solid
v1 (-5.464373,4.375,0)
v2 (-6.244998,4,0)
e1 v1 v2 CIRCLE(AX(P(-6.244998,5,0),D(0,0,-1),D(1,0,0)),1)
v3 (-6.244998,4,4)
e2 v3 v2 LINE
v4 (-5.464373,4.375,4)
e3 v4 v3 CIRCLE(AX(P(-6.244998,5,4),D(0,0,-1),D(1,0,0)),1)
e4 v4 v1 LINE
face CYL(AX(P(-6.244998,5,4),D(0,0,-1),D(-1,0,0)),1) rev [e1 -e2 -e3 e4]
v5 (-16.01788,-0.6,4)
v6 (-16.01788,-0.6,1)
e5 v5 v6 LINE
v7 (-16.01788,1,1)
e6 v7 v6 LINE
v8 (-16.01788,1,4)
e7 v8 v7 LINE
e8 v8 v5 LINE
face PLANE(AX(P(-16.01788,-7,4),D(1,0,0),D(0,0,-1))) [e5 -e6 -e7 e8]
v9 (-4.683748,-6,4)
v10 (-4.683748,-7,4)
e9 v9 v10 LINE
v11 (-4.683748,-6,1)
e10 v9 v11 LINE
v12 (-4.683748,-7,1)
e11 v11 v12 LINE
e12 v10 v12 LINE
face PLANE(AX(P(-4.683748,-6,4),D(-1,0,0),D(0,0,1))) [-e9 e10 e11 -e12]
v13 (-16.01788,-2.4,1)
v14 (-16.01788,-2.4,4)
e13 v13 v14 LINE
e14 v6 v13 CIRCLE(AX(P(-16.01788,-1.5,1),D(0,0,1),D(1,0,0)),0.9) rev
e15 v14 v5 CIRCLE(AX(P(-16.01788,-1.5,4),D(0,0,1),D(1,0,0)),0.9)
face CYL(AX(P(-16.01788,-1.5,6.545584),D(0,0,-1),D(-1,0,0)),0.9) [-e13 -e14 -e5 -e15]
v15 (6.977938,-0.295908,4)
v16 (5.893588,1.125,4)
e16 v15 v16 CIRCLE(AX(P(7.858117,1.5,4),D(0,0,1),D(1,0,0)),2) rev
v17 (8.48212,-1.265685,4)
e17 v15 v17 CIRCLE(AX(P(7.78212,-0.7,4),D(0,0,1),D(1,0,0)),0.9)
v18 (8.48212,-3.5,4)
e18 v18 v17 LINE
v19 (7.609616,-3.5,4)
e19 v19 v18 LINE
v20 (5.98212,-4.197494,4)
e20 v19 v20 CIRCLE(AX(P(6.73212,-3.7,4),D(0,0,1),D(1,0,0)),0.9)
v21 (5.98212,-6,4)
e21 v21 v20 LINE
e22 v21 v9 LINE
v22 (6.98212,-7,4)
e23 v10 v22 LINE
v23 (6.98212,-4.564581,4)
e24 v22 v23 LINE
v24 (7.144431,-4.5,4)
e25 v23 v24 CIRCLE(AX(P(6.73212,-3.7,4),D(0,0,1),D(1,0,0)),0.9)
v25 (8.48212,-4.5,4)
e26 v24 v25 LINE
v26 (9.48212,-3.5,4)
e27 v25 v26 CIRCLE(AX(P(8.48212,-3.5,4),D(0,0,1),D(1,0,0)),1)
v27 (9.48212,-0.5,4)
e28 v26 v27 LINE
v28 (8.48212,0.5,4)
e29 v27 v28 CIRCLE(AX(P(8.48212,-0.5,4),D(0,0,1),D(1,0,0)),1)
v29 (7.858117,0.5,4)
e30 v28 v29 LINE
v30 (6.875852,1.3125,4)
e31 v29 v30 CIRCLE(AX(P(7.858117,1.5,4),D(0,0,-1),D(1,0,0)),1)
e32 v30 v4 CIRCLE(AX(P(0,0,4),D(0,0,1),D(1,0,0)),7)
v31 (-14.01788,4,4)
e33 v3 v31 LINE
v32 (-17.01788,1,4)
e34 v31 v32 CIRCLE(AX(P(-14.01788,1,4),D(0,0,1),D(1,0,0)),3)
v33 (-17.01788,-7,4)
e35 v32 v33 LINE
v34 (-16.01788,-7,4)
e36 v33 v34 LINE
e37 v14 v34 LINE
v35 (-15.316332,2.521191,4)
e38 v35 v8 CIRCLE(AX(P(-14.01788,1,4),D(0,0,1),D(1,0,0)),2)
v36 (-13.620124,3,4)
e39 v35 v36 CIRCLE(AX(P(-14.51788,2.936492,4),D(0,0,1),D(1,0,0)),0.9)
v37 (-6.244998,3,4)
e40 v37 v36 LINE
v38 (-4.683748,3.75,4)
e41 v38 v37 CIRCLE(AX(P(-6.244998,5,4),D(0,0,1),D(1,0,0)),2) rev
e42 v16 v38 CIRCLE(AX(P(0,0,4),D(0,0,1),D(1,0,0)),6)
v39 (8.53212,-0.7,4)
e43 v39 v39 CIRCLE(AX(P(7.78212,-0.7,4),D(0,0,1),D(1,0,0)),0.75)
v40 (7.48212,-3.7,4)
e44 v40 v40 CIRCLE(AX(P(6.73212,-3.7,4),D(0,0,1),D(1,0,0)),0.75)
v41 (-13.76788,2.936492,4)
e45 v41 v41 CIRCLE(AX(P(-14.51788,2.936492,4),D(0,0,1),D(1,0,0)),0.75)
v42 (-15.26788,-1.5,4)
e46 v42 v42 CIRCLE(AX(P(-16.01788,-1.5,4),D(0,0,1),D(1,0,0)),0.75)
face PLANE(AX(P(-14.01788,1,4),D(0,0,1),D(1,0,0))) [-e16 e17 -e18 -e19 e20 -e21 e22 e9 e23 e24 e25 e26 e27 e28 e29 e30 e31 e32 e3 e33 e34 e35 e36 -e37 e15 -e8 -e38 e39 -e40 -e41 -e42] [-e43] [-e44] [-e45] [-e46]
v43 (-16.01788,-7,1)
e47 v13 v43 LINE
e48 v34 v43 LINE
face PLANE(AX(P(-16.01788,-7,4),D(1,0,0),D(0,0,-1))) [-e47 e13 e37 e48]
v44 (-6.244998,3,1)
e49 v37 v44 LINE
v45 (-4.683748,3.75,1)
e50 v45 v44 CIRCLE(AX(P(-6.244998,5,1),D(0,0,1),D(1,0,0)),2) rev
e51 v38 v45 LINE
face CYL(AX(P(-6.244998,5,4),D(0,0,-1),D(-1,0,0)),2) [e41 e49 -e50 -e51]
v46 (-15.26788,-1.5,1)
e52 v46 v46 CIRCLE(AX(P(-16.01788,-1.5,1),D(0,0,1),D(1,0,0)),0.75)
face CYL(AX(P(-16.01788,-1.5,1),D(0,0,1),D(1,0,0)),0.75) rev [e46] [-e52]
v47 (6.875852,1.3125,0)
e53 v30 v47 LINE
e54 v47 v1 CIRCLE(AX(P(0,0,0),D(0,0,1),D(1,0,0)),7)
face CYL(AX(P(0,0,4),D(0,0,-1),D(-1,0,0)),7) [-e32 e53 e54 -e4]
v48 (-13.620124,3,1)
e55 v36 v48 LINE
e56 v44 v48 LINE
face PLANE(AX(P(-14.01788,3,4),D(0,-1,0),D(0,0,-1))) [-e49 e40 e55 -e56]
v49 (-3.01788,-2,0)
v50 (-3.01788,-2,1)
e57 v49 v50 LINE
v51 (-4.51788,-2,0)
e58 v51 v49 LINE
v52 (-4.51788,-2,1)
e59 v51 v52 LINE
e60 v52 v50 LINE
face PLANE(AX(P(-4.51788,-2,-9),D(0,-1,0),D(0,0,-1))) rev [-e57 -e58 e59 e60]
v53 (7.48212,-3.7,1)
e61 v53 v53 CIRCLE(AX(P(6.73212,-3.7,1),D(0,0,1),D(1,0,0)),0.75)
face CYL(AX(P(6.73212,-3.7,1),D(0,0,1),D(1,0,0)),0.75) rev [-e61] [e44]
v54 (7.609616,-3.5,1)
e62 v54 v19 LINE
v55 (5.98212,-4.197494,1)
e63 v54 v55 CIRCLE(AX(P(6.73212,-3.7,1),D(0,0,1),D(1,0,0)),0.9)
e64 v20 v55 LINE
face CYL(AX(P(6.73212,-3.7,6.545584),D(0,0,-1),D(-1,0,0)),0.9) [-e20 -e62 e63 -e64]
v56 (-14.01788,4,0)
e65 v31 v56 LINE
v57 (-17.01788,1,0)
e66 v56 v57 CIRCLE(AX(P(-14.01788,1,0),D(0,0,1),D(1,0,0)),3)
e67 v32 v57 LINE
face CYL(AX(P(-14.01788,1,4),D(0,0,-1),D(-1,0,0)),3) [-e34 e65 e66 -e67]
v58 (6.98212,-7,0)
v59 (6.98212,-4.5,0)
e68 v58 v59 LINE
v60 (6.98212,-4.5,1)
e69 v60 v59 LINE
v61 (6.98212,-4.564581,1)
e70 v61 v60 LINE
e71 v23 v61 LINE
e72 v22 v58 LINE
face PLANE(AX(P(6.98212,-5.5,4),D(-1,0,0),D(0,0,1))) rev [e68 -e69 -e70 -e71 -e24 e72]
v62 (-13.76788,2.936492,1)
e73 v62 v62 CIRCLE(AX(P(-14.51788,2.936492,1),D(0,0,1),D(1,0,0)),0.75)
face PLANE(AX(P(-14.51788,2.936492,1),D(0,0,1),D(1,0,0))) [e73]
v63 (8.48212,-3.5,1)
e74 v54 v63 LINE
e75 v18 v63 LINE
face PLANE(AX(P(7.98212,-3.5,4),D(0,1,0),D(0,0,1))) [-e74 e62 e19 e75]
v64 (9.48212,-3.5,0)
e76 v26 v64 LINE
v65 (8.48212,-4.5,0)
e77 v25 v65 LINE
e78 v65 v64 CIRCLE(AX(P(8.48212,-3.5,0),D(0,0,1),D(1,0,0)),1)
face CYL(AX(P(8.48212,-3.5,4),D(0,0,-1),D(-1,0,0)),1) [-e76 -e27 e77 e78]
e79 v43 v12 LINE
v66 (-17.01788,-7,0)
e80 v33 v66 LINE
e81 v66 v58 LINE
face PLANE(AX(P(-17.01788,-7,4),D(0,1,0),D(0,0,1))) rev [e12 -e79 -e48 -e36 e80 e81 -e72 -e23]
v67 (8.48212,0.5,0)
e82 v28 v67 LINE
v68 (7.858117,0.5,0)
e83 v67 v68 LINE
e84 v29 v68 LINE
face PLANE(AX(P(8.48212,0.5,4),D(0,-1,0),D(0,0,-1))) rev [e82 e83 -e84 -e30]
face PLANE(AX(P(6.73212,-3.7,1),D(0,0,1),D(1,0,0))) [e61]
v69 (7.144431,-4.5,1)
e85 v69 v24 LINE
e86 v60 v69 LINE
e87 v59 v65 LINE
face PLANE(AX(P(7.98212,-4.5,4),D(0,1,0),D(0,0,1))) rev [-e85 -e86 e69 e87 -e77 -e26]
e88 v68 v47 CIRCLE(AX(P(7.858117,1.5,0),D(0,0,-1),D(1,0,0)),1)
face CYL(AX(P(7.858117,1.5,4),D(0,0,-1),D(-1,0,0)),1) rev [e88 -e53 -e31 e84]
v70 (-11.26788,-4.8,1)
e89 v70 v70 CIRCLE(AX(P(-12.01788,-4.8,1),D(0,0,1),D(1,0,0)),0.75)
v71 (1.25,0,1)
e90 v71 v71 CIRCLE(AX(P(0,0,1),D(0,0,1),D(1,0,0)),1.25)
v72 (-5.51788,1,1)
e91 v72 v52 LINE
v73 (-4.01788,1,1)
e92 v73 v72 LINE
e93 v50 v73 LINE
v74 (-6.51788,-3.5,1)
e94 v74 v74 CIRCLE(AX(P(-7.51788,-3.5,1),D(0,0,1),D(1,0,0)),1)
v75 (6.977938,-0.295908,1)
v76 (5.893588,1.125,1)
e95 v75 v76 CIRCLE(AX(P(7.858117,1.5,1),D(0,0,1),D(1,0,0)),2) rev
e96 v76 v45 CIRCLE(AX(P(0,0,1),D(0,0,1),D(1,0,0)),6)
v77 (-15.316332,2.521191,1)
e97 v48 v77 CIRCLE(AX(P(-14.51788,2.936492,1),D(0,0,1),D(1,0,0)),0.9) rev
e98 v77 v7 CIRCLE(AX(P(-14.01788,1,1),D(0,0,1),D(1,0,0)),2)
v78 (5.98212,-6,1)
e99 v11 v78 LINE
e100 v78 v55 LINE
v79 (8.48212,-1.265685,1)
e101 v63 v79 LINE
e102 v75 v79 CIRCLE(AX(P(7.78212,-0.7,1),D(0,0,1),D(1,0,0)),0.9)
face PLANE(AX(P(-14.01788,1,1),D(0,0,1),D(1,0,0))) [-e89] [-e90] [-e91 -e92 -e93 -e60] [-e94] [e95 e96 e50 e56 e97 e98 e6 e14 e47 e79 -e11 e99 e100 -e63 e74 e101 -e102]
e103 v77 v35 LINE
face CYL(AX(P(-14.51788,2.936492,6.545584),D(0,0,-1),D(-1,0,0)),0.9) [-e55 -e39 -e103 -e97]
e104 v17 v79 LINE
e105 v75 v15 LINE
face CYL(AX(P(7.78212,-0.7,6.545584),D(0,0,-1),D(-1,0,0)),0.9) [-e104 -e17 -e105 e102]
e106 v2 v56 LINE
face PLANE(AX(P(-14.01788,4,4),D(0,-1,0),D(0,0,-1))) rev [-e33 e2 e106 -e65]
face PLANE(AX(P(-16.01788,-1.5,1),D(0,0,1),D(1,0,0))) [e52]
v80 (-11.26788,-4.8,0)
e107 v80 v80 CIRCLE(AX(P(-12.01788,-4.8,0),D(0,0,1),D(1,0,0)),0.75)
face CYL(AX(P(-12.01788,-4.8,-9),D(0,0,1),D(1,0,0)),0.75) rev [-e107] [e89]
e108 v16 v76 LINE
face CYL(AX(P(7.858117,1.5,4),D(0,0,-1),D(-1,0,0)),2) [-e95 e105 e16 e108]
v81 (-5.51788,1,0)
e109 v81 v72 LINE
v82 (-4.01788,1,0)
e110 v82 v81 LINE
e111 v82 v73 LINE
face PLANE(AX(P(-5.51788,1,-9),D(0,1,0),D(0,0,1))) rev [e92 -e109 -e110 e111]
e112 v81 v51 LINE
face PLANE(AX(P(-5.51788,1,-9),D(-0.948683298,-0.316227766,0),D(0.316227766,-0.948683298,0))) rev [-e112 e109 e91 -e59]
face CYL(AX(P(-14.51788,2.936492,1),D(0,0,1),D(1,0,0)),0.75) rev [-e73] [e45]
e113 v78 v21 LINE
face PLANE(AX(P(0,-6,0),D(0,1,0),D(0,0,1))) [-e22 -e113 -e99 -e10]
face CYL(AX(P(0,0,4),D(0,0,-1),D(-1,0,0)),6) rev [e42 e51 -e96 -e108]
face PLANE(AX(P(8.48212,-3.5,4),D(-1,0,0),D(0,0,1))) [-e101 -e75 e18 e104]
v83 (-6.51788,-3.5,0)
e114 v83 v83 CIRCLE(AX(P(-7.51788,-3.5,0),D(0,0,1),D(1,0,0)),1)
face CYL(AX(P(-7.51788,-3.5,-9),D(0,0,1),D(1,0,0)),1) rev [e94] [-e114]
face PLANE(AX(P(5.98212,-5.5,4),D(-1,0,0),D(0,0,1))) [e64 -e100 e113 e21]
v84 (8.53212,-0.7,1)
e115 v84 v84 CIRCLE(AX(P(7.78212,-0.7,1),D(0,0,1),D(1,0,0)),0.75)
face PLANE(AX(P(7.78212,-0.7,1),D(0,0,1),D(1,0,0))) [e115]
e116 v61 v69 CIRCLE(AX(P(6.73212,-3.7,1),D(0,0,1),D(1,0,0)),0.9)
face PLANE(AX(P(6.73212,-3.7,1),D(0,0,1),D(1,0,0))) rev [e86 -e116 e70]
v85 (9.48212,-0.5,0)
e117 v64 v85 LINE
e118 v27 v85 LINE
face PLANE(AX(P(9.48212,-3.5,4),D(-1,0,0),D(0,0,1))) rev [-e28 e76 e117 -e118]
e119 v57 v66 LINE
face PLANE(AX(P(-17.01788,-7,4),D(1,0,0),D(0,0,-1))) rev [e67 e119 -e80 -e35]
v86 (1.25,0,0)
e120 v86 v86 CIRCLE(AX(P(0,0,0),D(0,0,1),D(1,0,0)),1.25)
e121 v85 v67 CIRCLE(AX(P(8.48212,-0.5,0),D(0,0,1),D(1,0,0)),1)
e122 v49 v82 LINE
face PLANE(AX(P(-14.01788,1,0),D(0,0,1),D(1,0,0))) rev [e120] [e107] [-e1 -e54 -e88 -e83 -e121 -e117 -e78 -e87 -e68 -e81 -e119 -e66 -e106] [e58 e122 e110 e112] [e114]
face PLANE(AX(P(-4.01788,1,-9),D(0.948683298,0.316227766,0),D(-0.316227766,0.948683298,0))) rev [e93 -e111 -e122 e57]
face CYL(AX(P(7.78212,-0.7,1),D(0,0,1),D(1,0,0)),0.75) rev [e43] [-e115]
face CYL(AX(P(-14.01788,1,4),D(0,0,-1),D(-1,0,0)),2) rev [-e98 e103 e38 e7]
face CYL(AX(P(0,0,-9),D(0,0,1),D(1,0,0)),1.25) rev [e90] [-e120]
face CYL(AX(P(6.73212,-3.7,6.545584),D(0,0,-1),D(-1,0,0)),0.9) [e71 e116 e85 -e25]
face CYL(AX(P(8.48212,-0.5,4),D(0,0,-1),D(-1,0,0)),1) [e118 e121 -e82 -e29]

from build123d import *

# Parameters (mm, degrees)
BOSS_EXTRUDE1_DEPTH = 4
SHELL1_START        = 1
SHELL1_DEPTH        = 3
SKETCH2_R           = 1.25
SKETCH2_R_2         = 0.75
SKETCH2_R_3         = 1
CUT_EXTRUDE1_DEPTH  = 10
SKETCH3_W           = 10.665868521
SKETCH3_H           = 3
BOSS_EXTRUDE2_DEPTH = 1
SKETCH4_R           = 0.9
BOSS_EXTRUDE3_DEPTH = 3
SKETCH5_R           = 0.75
CUT_EXTRUDE2_DEPTH  = 3


# Read off the part's stored shape, not the designer's step: Shell1
with BuildPart() as part:
    # Sketch1 → Boss-Extrude1 (new body)
    with BuildSketch(Plane.XY):
        with BuildLine():
            Line((-17.017879978, -7), (6.982120022, -7))
            Line((6.982120022, -7), (6.982120022, -5.5))
            Line((6.982120022, -5.5), (6.982120022, -4.5))
            Line((6.982120022, -4.5), (7.982120022, -4.5))
            Line((7.982120022, -4.5), (8.482120022, -4.5))
            ThreePointArc((8.482120022, -4.5), (9.189226803, -4.207106781), (9.482120022, -3.5))
            Line((9.482120022, -3.5), (9.482120022, -0.5))
            ThreePointArc((9.482120022, -0.5), (9.189226803, 0.207106781), (8.482120022, 0.5))
            Line((8.482120022, 0.5), (7.858116823, 0.5))
            ThreePointArc((7.858116823, 0.5), (7.220739384, 0.72944825), (6.87585222, 1.3125))
            ThreePointArc((6.87585222, 1.3125), (1.68605895, 6.793909421), (-5.464373249, 4.375))
            ThreePointArc((-5.464373249, 4.375), (-5.811985297, 4.098612181), (-6.244997998, 4))
            Line((-6.244997998, 4), (-14.017879978, 4))
            ThreePointArc((-14.017879978, 4), (-16.139200322, 3.121320344), (-17.017879978, 1))
            Line((-17.017879978, 1), (-17.017879978, -7))
        make_face()
    extrude(amount=BOSS_EXTRUDE1_DEPTH)

    # Shell1 outline → Shell1 (cut)
    with BuildSketch(Plane.XY.offset(SHELL1_START)):
        with BuildLine():
            Line((-16.017879978, 1), (-16.017879978, -7))
            Line((-16.017879978, -7), (5.982120022, -7))
            Line((5.982120022, -7), (5.982120022, -3.5))
            Line((5.982120022, -3.5), (8.482120022, -3.5))
            Line((8.482120022, -3.5), (8.482120022, -0.5))
            Line((8.482120022, -0.5), (7.858116823, -0.5))
            ThreePointArc((7.858116823, -0.5), (6.583361944, -0.041103501), (5.893587617, 1.125))
            ThreePointArc((5.893587617, 1.125), (1.445193386, 5.823350932), (-4.683748499, 3.75))
            ThreePointArc((-4.683748499, 3.75), (-5.378972594, 3.197224362), (-6.244997998, 3))
            Line((-6.244997998, 3), (-14.017879978, 3))
            ThreePointArc((-14.017879978, 3), (-15.43209354, 2.414213562), (-16.017879978, 1))
        make_face()
    extrude(amount=SHELL1_DEPTH, mode=Mode.SUBTRACT)

    # Sketch2 → Cut-Extrude1 (cut)
    with BuildSketch(Plane.XY.offset(1)):
        Circle(SKETCH2_R)
        with Locations((-12.017879978, -4.8)):
            Circle(SKETCH2_R_2)
        with Locations((-7.517879978, -3.5)):
            Circle(SKETCH2_R_3)
        Polygon((-5.517879978, 1), (-4.017879978, 1), (-3.017879978, -2), (-4.517879978, -2), align=None)
    extrude(amount=-CUT_EXTRUDE1_DEPTH, mode=Mode.SUBTRACT)

    # Sketch3 → Boss-Extrude2 (add)
    with BuildSketch(Plane.XZ.offset(7)):
        with Locations((0.649185762, 2.5)):
            Rectangle(SKETCH3_W, SKETCH3_H)
    extrude(amount=-BOSS_EXTRUDE2_DEPTH)

    # Sketch4 → Boss-Extrude3 (add)
    with BuildSketch(Plane.XY.offset(1)):
        with Locations((-14.517879978, 2.936491673)):
            Circle(SKETCH4_R)
        with Locations((-16.017879978, -1.5)):
            Circle(SKETCH4_R)
        with Locations((7.782120022, -0.7)):
            Circle(SKETCH4_R)
        with Locations((6.732120022, -3.7)):
            Circle(SKETCH4_R)
    extrude(amount=BOSS_EXTRUDE3_DEPTH)

    # Sketch5 → Cut-Extrude2 (cut)
    with BuildSketch(Plane.XY.offset(4)):
        with Locations((-14.517879978, 2.936491673)):
            Circle(SKETCH5_R)
        with Locations((-16.017879978, -1.5)):
            Circle(SKETCH5_R)
        with Locations((6.732120022, -3.7)):
            Circle(SKETCH5_R)
        with Locations((7.782120022, -0.7)):
            Circle(SKETCH5_R)
    extrude(amount=-CUT_EXTRUDE2_DEPTH, mode=Mode.SUBTRACT)


solid = part.part
